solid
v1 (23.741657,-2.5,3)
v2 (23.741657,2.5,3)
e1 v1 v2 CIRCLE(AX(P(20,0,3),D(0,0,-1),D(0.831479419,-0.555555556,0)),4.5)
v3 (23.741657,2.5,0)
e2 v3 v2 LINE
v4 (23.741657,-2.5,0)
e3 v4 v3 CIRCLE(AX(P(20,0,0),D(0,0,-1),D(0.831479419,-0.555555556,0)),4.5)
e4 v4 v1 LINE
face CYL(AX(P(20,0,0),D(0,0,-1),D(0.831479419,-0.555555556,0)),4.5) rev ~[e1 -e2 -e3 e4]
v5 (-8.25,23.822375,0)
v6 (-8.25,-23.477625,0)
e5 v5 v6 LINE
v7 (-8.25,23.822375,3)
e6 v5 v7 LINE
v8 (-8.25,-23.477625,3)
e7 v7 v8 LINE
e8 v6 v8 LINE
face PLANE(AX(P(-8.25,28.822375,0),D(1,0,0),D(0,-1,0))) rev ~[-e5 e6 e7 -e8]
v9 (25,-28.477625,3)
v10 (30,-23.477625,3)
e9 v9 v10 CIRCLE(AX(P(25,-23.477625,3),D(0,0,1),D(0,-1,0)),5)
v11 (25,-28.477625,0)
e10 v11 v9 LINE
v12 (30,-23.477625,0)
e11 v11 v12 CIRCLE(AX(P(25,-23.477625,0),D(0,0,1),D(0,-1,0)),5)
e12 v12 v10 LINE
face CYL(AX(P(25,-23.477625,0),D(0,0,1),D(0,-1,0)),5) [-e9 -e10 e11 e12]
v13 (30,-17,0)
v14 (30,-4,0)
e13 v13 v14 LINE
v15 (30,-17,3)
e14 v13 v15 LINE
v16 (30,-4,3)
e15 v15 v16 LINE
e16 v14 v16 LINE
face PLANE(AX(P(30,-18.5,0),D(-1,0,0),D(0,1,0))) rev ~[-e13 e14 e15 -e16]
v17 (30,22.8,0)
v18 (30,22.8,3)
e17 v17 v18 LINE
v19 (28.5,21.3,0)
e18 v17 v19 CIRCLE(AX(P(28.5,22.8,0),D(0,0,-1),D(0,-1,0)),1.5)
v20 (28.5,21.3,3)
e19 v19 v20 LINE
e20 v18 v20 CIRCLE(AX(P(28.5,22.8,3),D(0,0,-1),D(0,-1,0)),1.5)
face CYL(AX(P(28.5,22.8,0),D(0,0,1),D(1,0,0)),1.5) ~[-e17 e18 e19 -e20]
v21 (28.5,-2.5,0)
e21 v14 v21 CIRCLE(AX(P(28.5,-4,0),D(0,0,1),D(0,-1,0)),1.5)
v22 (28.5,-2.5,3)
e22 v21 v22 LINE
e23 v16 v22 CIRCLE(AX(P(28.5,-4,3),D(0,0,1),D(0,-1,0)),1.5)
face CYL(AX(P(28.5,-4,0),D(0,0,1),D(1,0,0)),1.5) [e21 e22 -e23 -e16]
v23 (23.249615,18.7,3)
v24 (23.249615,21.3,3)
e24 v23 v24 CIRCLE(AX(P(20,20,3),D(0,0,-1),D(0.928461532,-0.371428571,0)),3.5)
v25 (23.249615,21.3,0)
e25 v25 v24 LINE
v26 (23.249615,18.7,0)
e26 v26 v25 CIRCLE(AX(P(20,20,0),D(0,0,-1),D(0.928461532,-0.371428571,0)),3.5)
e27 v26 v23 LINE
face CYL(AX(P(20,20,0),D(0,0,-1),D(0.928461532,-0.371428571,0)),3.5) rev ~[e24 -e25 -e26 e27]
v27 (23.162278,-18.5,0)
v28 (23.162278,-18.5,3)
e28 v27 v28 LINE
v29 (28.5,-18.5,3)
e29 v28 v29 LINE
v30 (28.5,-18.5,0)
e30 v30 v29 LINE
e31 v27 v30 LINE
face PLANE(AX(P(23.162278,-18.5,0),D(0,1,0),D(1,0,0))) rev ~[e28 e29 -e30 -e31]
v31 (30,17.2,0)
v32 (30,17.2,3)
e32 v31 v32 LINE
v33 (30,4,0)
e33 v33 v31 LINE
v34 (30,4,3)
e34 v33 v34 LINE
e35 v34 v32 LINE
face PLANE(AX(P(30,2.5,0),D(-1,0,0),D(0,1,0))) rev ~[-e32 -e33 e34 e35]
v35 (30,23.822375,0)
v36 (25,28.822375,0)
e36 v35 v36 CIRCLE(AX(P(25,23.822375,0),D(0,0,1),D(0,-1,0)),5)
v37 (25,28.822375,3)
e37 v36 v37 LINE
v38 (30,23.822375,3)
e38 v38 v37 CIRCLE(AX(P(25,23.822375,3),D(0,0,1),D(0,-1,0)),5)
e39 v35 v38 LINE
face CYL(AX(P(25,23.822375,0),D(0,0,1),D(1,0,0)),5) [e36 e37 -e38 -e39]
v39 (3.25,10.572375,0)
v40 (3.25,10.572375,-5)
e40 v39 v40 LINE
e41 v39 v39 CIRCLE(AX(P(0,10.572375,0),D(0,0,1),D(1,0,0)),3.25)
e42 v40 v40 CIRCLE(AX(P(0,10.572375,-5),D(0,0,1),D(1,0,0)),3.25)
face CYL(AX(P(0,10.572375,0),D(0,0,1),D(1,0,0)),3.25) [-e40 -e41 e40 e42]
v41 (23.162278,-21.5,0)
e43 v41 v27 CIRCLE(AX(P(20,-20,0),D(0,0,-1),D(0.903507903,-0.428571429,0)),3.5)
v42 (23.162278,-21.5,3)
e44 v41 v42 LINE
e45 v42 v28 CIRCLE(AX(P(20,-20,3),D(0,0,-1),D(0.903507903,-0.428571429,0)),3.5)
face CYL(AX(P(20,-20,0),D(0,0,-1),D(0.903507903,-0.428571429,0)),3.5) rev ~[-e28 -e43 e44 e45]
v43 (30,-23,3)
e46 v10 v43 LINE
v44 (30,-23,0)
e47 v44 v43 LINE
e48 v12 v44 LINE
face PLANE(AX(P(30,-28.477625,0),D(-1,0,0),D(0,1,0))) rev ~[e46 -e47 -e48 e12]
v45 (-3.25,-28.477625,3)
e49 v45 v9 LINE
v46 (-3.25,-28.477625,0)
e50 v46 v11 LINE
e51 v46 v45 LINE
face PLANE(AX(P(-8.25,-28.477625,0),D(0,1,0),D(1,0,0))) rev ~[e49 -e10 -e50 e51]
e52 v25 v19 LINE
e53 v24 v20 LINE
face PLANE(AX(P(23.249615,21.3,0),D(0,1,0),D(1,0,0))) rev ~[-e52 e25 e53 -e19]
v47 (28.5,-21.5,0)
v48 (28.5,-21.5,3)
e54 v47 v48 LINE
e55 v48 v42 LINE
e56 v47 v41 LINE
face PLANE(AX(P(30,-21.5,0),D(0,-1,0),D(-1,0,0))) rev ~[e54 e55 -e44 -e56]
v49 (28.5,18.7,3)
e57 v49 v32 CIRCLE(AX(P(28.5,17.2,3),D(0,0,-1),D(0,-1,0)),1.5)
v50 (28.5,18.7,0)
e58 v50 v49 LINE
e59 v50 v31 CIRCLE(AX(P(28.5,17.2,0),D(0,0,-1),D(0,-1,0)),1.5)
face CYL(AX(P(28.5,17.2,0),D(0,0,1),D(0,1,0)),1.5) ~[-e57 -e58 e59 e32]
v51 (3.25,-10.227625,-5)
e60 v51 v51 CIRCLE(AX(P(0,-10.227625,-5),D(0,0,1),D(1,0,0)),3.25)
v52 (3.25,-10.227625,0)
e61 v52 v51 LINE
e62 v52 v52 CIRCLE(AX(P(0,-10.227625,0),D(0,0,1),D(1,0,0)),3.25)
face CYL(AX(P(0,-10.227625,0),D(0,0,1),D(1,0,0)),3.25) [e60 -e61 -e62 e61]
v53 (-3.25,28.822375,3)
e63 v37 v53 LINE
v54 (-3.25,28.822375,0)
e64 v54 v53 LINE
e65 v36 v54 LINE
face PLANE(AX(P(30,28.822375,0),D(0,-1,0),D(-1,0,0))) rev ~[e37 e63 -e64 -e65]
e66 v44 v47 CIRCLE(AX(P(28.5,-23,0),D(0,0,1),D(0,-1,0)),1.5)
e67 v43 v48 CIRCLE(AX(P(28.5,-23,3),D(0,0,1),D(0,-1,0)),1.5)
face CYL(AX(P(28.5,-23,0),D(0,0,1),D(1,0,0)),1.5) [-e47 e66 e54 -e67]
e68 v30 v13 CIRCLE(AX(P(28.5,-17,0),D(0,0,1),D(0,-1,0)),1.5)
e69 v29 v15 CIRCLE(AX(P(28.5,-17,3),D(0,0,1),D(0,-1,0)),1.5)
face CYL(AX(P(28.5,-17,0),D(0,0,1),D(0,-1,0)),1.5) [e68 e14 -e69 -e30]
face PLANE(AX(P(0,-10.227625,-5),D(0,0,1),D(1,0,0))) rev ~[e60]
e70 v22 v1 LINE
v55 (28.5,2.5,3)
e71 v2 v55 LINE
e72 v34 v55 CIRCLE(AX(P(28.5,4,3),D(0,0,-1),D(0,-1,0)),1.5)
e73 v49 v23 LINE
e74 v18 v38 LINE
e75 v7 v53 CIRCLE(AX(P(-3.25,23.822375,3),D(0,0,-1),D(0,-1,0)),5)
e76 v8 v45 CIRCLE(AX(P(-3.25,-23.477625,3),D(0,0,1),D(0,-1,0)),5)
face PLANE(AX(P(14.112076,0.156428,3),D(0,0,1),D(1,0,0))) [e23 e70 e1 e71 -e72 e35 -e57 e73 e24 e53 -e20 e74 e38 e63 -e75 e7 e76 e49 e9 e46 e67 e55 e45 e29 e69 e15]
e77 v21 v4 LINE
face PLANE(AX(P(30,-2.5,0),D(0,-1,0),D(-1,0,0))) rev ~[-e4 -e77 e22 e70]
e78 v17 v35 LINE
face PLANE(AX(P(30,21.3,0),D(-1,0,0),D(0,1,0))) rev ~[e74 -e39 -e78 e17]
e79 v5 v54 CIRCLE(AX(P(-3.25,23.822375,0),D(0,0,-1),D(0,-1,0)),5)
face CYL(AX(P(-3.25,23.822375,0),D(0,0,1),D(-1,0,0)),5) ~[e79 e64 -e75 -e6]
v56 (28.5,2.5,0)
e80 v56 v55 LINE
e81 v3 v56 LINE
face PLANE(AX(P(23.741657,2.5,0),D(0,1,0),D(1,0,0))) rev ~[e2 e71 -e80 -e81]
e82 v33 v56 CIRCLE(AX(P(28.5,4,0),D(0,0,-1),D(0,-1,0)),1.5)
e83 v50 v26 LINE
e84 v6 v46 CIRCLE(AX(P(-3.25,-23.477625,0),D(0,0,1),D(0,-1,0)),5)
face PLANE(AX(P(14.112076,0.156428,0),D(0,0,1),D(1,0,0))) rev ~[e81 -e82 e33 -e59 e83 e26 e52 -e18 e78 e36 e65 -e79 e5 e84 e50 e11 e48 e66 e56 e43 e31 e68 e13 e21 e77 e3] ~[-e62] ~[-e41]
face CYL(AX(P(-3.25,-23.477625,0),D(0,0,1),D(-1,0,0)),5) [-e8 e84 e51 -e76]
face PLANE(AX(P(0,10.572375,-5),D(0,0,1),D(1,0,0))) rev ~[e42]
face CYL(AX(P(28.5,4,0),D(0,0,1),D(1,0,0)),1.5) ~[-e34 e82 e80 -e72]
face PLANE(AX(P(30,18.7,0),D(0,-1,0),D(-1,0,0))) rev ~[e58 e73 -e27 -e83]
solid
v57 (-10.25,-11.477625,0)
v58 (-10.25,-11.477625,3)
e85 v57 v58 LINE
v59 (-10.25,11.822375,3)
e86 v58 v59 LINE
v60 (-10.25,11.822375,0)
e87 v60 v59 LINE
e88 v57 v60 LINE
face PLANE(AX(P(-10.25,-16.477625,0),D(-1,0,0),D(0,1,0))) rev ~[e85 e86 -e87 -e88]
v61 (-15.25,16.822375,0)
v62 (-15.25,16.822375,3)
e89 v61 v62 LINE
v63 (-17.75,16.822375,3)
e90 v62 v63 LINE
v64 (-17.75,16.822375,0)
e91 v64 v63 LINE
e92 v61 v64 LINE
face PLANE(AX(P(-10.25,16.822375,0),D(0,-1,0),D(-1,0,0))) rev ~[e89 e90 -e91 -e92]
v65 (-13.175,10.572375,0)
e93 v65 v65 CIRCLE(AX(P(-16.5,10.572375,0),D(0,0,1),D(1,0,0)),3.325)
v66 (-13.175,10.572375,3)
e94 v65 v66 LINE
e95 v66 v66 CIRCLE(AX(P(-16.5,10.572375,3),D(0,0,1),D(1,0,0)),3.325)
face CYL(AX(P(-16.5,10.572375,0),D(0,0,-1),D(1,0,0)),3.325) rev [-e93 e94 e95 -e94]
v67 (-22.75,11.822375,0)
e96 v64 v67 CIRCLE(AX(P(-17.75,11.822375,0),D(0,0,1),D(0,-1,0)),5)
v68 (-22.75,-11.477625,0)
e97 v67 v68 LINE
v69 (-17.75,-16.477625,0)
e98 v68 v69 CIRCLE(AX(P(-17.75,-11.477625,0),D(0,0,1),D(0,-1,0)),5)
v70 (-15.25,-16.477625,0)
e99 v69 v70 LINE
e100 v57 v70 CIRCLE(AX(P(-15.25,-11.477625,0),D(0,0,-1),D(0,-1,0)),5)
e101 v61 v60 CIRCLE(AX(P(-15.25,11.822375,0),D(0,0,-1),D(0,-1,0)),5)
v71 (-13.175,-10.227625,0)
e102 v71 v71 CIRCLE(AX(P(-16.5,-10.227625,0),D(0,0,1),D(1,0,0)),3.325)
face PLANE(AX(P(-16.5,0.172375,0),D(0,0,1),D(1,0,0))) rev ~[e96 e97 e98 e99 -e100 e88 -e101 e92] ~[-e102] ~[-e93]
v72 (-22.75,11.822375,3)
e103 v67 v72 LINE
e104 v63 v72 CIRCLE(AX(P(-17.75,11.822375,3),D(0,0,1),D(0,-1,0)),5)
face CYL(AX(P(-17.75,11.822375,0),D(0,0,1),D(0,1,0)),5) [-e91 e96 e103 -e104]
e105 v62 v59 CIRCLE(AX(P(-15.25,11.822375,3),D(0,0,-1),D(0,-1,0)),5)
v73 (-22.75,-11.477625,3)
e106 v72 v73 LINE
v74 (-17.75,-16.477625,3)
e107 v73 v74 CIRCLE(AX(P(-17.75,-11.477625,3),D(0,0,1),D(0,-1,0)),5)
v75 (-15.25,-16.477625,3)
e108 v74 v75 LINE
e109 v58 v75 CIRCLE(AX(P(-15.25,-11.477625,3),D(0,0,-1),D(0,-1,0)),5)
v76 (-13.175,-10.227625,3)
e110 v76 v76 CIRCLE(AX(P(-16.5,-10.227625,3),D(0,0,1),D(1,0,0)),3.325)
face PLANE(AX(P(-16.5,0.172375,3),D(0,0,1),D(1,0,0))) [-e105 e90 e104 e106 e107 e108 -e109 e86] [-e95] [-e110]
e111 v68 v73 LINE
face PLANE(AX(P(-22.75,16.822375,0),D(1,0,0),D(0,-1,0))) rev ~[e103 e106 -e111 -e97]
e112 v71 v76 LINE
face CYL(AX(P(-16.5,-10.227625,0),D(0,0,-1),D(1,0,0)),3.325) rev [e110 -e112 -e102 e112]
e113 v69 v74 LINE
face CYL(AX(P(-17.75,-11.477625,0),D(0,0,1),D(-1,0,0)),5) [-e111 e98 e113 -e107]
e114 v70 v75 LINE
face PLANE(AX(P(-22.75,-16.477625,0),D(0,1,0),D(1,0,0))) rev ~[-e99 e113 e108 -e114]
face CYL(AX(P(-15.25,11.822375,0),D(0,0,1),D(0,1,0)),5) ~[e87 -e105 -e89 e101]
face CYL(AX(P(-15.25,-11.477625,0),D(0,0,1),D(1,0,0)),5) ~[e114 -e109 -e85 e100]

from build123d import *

# Parameters (mm, degrees)
F0_R     = 3.25
F1_DEPTH = 3
F2_R     = 5
F3_DEPTH = 5
F0_R_2   = 3.325
F4_DEPTH = 3
F5_R     = 5
F6_R     = 1.5


with BuildPart() as f1:
    # F0 (on Top) → F1 (new body)
    with BuildSketch(Plane.XY):
        with BuildLine():
            Line((-8.25, 28.8223753949), (-8.25, -28.4776246051))
            Line((-8.25, -28.4776246051), (30, -28.4776246051))
            Line((30, -28.4776246051), (30, -21.5))
            Line((30, -21.5), (23.1622776602, -21.5))
            ThreePointArc((23.1622776602, -21.5), (16.5, -20), (23.1622776602, -18.5))
            Line((23.1622776602, -18.5), (30, -18.5))
            Line((30, -18.5), (30, -2.5))
            Line((30, -2.5), (23.7416573868, -2.5))
            ThreePointArc((23.7416573868, -2.5), (15.5, 0), (23.7416573868, 2.5))
            Line((23.7416573868, 2.5), (30, 2.5))
            Line((30, 2.5), (30, 18.7))
            Line((30, 18.7), (23.2496153619, 18.7))
            ThreePointArc((23.2496153619, 18.7), (16.5, 20), (23.2496153619, 21.3))
            Line((23.2496153619, 21.3), (30, 21.3))
            Line((30, 21.3), (30, 28.8223753949))
            Line((30, 28.8223753949), (-8.25, 28.8223753949))
        make_face()
        with Locations((0, -10.2276246051)):
            Circle(F0_R, mode=Mode.SUBTRACT)
        with Locations((0, 10.5723753949)):
            Circle(F0_R, mode=Mode.SUBTRACT)
        with Locations((0, 10.5723753949)):
            Circle(F0_R)
        with Locations((0, -10.2276246051)):
            Circle(F0_R)
    extrude(amount=F1_DEPTH)

    # F2
    f2_edges = [f1.edges().sort_by_distance(p)[0] for p in [
        (-8.25, 28.822375, 1.5),
        (-8.25, -28.477625, 1.5),
        (30, -28.477625, 1.5),
        (30, 28.822375, 1.5),
    ]]
    fillet(f2_edges, radius=F2_R)

    # F0 (on Top) → F3 (join)
    with BuildSketch(Plane.XY):
        with Locations((0, 10.5723753949)):
            Circle(F0_R)
        with Locations((0, -10.2276246051)):
            Circle(F0_R)
    extrude(amount=-F3_DEPTH)

    # F6
    f6_edges = [f1.edges().sort_by_distance(p)[0] for p in [
        (30, -2.5, 1.5),
        (30, 2.5, 1.5),
        (30, 18.7, 1.5),
        (30, 21.3, 1.5),
        (30, -21.5, 1.5),
        (30, -18.5, 1.5),
    ]]
    fillet(f6_edges, radius=F6_R)


with BuildPart() as f4:
    # F0 (on Top) → F4 (new body)
    with BuildSketch(Plane.XY):
        Polygon((-10.25, 16.8223753949), (-16.5, 16.8223753949), (-22.75, 16.8223753949), (-22.75, -16.4776246051), (-16.5, -16.4776246051), (-10.25, -16.4776246051), align=None)
        with Locations((-16.5, -10.2276246051)):
            Circle(F0_R_2, mode=Mode.SUBTRACT)
        with Locations((-16.5, 10.5723753949)):
            Circle(F0_R_2, mode=Mode.SUBTRACT)
    extrude(amount=F4_DEPTH)

    # F5
    f5_edges = [f4.edges().sort_by_distance(p)[0] for p in [
        (-22.75, 16.822375, 1.5),
        (-22.75, -16.477625, 1.5),
        (-10.25, 16.822375, 1.5),
        (-10.25, -16.477625, 1.5),
    ]]
    fillet(f5_edges, radius=F5_R)


solid = Compound([f1.part, f4.part])
